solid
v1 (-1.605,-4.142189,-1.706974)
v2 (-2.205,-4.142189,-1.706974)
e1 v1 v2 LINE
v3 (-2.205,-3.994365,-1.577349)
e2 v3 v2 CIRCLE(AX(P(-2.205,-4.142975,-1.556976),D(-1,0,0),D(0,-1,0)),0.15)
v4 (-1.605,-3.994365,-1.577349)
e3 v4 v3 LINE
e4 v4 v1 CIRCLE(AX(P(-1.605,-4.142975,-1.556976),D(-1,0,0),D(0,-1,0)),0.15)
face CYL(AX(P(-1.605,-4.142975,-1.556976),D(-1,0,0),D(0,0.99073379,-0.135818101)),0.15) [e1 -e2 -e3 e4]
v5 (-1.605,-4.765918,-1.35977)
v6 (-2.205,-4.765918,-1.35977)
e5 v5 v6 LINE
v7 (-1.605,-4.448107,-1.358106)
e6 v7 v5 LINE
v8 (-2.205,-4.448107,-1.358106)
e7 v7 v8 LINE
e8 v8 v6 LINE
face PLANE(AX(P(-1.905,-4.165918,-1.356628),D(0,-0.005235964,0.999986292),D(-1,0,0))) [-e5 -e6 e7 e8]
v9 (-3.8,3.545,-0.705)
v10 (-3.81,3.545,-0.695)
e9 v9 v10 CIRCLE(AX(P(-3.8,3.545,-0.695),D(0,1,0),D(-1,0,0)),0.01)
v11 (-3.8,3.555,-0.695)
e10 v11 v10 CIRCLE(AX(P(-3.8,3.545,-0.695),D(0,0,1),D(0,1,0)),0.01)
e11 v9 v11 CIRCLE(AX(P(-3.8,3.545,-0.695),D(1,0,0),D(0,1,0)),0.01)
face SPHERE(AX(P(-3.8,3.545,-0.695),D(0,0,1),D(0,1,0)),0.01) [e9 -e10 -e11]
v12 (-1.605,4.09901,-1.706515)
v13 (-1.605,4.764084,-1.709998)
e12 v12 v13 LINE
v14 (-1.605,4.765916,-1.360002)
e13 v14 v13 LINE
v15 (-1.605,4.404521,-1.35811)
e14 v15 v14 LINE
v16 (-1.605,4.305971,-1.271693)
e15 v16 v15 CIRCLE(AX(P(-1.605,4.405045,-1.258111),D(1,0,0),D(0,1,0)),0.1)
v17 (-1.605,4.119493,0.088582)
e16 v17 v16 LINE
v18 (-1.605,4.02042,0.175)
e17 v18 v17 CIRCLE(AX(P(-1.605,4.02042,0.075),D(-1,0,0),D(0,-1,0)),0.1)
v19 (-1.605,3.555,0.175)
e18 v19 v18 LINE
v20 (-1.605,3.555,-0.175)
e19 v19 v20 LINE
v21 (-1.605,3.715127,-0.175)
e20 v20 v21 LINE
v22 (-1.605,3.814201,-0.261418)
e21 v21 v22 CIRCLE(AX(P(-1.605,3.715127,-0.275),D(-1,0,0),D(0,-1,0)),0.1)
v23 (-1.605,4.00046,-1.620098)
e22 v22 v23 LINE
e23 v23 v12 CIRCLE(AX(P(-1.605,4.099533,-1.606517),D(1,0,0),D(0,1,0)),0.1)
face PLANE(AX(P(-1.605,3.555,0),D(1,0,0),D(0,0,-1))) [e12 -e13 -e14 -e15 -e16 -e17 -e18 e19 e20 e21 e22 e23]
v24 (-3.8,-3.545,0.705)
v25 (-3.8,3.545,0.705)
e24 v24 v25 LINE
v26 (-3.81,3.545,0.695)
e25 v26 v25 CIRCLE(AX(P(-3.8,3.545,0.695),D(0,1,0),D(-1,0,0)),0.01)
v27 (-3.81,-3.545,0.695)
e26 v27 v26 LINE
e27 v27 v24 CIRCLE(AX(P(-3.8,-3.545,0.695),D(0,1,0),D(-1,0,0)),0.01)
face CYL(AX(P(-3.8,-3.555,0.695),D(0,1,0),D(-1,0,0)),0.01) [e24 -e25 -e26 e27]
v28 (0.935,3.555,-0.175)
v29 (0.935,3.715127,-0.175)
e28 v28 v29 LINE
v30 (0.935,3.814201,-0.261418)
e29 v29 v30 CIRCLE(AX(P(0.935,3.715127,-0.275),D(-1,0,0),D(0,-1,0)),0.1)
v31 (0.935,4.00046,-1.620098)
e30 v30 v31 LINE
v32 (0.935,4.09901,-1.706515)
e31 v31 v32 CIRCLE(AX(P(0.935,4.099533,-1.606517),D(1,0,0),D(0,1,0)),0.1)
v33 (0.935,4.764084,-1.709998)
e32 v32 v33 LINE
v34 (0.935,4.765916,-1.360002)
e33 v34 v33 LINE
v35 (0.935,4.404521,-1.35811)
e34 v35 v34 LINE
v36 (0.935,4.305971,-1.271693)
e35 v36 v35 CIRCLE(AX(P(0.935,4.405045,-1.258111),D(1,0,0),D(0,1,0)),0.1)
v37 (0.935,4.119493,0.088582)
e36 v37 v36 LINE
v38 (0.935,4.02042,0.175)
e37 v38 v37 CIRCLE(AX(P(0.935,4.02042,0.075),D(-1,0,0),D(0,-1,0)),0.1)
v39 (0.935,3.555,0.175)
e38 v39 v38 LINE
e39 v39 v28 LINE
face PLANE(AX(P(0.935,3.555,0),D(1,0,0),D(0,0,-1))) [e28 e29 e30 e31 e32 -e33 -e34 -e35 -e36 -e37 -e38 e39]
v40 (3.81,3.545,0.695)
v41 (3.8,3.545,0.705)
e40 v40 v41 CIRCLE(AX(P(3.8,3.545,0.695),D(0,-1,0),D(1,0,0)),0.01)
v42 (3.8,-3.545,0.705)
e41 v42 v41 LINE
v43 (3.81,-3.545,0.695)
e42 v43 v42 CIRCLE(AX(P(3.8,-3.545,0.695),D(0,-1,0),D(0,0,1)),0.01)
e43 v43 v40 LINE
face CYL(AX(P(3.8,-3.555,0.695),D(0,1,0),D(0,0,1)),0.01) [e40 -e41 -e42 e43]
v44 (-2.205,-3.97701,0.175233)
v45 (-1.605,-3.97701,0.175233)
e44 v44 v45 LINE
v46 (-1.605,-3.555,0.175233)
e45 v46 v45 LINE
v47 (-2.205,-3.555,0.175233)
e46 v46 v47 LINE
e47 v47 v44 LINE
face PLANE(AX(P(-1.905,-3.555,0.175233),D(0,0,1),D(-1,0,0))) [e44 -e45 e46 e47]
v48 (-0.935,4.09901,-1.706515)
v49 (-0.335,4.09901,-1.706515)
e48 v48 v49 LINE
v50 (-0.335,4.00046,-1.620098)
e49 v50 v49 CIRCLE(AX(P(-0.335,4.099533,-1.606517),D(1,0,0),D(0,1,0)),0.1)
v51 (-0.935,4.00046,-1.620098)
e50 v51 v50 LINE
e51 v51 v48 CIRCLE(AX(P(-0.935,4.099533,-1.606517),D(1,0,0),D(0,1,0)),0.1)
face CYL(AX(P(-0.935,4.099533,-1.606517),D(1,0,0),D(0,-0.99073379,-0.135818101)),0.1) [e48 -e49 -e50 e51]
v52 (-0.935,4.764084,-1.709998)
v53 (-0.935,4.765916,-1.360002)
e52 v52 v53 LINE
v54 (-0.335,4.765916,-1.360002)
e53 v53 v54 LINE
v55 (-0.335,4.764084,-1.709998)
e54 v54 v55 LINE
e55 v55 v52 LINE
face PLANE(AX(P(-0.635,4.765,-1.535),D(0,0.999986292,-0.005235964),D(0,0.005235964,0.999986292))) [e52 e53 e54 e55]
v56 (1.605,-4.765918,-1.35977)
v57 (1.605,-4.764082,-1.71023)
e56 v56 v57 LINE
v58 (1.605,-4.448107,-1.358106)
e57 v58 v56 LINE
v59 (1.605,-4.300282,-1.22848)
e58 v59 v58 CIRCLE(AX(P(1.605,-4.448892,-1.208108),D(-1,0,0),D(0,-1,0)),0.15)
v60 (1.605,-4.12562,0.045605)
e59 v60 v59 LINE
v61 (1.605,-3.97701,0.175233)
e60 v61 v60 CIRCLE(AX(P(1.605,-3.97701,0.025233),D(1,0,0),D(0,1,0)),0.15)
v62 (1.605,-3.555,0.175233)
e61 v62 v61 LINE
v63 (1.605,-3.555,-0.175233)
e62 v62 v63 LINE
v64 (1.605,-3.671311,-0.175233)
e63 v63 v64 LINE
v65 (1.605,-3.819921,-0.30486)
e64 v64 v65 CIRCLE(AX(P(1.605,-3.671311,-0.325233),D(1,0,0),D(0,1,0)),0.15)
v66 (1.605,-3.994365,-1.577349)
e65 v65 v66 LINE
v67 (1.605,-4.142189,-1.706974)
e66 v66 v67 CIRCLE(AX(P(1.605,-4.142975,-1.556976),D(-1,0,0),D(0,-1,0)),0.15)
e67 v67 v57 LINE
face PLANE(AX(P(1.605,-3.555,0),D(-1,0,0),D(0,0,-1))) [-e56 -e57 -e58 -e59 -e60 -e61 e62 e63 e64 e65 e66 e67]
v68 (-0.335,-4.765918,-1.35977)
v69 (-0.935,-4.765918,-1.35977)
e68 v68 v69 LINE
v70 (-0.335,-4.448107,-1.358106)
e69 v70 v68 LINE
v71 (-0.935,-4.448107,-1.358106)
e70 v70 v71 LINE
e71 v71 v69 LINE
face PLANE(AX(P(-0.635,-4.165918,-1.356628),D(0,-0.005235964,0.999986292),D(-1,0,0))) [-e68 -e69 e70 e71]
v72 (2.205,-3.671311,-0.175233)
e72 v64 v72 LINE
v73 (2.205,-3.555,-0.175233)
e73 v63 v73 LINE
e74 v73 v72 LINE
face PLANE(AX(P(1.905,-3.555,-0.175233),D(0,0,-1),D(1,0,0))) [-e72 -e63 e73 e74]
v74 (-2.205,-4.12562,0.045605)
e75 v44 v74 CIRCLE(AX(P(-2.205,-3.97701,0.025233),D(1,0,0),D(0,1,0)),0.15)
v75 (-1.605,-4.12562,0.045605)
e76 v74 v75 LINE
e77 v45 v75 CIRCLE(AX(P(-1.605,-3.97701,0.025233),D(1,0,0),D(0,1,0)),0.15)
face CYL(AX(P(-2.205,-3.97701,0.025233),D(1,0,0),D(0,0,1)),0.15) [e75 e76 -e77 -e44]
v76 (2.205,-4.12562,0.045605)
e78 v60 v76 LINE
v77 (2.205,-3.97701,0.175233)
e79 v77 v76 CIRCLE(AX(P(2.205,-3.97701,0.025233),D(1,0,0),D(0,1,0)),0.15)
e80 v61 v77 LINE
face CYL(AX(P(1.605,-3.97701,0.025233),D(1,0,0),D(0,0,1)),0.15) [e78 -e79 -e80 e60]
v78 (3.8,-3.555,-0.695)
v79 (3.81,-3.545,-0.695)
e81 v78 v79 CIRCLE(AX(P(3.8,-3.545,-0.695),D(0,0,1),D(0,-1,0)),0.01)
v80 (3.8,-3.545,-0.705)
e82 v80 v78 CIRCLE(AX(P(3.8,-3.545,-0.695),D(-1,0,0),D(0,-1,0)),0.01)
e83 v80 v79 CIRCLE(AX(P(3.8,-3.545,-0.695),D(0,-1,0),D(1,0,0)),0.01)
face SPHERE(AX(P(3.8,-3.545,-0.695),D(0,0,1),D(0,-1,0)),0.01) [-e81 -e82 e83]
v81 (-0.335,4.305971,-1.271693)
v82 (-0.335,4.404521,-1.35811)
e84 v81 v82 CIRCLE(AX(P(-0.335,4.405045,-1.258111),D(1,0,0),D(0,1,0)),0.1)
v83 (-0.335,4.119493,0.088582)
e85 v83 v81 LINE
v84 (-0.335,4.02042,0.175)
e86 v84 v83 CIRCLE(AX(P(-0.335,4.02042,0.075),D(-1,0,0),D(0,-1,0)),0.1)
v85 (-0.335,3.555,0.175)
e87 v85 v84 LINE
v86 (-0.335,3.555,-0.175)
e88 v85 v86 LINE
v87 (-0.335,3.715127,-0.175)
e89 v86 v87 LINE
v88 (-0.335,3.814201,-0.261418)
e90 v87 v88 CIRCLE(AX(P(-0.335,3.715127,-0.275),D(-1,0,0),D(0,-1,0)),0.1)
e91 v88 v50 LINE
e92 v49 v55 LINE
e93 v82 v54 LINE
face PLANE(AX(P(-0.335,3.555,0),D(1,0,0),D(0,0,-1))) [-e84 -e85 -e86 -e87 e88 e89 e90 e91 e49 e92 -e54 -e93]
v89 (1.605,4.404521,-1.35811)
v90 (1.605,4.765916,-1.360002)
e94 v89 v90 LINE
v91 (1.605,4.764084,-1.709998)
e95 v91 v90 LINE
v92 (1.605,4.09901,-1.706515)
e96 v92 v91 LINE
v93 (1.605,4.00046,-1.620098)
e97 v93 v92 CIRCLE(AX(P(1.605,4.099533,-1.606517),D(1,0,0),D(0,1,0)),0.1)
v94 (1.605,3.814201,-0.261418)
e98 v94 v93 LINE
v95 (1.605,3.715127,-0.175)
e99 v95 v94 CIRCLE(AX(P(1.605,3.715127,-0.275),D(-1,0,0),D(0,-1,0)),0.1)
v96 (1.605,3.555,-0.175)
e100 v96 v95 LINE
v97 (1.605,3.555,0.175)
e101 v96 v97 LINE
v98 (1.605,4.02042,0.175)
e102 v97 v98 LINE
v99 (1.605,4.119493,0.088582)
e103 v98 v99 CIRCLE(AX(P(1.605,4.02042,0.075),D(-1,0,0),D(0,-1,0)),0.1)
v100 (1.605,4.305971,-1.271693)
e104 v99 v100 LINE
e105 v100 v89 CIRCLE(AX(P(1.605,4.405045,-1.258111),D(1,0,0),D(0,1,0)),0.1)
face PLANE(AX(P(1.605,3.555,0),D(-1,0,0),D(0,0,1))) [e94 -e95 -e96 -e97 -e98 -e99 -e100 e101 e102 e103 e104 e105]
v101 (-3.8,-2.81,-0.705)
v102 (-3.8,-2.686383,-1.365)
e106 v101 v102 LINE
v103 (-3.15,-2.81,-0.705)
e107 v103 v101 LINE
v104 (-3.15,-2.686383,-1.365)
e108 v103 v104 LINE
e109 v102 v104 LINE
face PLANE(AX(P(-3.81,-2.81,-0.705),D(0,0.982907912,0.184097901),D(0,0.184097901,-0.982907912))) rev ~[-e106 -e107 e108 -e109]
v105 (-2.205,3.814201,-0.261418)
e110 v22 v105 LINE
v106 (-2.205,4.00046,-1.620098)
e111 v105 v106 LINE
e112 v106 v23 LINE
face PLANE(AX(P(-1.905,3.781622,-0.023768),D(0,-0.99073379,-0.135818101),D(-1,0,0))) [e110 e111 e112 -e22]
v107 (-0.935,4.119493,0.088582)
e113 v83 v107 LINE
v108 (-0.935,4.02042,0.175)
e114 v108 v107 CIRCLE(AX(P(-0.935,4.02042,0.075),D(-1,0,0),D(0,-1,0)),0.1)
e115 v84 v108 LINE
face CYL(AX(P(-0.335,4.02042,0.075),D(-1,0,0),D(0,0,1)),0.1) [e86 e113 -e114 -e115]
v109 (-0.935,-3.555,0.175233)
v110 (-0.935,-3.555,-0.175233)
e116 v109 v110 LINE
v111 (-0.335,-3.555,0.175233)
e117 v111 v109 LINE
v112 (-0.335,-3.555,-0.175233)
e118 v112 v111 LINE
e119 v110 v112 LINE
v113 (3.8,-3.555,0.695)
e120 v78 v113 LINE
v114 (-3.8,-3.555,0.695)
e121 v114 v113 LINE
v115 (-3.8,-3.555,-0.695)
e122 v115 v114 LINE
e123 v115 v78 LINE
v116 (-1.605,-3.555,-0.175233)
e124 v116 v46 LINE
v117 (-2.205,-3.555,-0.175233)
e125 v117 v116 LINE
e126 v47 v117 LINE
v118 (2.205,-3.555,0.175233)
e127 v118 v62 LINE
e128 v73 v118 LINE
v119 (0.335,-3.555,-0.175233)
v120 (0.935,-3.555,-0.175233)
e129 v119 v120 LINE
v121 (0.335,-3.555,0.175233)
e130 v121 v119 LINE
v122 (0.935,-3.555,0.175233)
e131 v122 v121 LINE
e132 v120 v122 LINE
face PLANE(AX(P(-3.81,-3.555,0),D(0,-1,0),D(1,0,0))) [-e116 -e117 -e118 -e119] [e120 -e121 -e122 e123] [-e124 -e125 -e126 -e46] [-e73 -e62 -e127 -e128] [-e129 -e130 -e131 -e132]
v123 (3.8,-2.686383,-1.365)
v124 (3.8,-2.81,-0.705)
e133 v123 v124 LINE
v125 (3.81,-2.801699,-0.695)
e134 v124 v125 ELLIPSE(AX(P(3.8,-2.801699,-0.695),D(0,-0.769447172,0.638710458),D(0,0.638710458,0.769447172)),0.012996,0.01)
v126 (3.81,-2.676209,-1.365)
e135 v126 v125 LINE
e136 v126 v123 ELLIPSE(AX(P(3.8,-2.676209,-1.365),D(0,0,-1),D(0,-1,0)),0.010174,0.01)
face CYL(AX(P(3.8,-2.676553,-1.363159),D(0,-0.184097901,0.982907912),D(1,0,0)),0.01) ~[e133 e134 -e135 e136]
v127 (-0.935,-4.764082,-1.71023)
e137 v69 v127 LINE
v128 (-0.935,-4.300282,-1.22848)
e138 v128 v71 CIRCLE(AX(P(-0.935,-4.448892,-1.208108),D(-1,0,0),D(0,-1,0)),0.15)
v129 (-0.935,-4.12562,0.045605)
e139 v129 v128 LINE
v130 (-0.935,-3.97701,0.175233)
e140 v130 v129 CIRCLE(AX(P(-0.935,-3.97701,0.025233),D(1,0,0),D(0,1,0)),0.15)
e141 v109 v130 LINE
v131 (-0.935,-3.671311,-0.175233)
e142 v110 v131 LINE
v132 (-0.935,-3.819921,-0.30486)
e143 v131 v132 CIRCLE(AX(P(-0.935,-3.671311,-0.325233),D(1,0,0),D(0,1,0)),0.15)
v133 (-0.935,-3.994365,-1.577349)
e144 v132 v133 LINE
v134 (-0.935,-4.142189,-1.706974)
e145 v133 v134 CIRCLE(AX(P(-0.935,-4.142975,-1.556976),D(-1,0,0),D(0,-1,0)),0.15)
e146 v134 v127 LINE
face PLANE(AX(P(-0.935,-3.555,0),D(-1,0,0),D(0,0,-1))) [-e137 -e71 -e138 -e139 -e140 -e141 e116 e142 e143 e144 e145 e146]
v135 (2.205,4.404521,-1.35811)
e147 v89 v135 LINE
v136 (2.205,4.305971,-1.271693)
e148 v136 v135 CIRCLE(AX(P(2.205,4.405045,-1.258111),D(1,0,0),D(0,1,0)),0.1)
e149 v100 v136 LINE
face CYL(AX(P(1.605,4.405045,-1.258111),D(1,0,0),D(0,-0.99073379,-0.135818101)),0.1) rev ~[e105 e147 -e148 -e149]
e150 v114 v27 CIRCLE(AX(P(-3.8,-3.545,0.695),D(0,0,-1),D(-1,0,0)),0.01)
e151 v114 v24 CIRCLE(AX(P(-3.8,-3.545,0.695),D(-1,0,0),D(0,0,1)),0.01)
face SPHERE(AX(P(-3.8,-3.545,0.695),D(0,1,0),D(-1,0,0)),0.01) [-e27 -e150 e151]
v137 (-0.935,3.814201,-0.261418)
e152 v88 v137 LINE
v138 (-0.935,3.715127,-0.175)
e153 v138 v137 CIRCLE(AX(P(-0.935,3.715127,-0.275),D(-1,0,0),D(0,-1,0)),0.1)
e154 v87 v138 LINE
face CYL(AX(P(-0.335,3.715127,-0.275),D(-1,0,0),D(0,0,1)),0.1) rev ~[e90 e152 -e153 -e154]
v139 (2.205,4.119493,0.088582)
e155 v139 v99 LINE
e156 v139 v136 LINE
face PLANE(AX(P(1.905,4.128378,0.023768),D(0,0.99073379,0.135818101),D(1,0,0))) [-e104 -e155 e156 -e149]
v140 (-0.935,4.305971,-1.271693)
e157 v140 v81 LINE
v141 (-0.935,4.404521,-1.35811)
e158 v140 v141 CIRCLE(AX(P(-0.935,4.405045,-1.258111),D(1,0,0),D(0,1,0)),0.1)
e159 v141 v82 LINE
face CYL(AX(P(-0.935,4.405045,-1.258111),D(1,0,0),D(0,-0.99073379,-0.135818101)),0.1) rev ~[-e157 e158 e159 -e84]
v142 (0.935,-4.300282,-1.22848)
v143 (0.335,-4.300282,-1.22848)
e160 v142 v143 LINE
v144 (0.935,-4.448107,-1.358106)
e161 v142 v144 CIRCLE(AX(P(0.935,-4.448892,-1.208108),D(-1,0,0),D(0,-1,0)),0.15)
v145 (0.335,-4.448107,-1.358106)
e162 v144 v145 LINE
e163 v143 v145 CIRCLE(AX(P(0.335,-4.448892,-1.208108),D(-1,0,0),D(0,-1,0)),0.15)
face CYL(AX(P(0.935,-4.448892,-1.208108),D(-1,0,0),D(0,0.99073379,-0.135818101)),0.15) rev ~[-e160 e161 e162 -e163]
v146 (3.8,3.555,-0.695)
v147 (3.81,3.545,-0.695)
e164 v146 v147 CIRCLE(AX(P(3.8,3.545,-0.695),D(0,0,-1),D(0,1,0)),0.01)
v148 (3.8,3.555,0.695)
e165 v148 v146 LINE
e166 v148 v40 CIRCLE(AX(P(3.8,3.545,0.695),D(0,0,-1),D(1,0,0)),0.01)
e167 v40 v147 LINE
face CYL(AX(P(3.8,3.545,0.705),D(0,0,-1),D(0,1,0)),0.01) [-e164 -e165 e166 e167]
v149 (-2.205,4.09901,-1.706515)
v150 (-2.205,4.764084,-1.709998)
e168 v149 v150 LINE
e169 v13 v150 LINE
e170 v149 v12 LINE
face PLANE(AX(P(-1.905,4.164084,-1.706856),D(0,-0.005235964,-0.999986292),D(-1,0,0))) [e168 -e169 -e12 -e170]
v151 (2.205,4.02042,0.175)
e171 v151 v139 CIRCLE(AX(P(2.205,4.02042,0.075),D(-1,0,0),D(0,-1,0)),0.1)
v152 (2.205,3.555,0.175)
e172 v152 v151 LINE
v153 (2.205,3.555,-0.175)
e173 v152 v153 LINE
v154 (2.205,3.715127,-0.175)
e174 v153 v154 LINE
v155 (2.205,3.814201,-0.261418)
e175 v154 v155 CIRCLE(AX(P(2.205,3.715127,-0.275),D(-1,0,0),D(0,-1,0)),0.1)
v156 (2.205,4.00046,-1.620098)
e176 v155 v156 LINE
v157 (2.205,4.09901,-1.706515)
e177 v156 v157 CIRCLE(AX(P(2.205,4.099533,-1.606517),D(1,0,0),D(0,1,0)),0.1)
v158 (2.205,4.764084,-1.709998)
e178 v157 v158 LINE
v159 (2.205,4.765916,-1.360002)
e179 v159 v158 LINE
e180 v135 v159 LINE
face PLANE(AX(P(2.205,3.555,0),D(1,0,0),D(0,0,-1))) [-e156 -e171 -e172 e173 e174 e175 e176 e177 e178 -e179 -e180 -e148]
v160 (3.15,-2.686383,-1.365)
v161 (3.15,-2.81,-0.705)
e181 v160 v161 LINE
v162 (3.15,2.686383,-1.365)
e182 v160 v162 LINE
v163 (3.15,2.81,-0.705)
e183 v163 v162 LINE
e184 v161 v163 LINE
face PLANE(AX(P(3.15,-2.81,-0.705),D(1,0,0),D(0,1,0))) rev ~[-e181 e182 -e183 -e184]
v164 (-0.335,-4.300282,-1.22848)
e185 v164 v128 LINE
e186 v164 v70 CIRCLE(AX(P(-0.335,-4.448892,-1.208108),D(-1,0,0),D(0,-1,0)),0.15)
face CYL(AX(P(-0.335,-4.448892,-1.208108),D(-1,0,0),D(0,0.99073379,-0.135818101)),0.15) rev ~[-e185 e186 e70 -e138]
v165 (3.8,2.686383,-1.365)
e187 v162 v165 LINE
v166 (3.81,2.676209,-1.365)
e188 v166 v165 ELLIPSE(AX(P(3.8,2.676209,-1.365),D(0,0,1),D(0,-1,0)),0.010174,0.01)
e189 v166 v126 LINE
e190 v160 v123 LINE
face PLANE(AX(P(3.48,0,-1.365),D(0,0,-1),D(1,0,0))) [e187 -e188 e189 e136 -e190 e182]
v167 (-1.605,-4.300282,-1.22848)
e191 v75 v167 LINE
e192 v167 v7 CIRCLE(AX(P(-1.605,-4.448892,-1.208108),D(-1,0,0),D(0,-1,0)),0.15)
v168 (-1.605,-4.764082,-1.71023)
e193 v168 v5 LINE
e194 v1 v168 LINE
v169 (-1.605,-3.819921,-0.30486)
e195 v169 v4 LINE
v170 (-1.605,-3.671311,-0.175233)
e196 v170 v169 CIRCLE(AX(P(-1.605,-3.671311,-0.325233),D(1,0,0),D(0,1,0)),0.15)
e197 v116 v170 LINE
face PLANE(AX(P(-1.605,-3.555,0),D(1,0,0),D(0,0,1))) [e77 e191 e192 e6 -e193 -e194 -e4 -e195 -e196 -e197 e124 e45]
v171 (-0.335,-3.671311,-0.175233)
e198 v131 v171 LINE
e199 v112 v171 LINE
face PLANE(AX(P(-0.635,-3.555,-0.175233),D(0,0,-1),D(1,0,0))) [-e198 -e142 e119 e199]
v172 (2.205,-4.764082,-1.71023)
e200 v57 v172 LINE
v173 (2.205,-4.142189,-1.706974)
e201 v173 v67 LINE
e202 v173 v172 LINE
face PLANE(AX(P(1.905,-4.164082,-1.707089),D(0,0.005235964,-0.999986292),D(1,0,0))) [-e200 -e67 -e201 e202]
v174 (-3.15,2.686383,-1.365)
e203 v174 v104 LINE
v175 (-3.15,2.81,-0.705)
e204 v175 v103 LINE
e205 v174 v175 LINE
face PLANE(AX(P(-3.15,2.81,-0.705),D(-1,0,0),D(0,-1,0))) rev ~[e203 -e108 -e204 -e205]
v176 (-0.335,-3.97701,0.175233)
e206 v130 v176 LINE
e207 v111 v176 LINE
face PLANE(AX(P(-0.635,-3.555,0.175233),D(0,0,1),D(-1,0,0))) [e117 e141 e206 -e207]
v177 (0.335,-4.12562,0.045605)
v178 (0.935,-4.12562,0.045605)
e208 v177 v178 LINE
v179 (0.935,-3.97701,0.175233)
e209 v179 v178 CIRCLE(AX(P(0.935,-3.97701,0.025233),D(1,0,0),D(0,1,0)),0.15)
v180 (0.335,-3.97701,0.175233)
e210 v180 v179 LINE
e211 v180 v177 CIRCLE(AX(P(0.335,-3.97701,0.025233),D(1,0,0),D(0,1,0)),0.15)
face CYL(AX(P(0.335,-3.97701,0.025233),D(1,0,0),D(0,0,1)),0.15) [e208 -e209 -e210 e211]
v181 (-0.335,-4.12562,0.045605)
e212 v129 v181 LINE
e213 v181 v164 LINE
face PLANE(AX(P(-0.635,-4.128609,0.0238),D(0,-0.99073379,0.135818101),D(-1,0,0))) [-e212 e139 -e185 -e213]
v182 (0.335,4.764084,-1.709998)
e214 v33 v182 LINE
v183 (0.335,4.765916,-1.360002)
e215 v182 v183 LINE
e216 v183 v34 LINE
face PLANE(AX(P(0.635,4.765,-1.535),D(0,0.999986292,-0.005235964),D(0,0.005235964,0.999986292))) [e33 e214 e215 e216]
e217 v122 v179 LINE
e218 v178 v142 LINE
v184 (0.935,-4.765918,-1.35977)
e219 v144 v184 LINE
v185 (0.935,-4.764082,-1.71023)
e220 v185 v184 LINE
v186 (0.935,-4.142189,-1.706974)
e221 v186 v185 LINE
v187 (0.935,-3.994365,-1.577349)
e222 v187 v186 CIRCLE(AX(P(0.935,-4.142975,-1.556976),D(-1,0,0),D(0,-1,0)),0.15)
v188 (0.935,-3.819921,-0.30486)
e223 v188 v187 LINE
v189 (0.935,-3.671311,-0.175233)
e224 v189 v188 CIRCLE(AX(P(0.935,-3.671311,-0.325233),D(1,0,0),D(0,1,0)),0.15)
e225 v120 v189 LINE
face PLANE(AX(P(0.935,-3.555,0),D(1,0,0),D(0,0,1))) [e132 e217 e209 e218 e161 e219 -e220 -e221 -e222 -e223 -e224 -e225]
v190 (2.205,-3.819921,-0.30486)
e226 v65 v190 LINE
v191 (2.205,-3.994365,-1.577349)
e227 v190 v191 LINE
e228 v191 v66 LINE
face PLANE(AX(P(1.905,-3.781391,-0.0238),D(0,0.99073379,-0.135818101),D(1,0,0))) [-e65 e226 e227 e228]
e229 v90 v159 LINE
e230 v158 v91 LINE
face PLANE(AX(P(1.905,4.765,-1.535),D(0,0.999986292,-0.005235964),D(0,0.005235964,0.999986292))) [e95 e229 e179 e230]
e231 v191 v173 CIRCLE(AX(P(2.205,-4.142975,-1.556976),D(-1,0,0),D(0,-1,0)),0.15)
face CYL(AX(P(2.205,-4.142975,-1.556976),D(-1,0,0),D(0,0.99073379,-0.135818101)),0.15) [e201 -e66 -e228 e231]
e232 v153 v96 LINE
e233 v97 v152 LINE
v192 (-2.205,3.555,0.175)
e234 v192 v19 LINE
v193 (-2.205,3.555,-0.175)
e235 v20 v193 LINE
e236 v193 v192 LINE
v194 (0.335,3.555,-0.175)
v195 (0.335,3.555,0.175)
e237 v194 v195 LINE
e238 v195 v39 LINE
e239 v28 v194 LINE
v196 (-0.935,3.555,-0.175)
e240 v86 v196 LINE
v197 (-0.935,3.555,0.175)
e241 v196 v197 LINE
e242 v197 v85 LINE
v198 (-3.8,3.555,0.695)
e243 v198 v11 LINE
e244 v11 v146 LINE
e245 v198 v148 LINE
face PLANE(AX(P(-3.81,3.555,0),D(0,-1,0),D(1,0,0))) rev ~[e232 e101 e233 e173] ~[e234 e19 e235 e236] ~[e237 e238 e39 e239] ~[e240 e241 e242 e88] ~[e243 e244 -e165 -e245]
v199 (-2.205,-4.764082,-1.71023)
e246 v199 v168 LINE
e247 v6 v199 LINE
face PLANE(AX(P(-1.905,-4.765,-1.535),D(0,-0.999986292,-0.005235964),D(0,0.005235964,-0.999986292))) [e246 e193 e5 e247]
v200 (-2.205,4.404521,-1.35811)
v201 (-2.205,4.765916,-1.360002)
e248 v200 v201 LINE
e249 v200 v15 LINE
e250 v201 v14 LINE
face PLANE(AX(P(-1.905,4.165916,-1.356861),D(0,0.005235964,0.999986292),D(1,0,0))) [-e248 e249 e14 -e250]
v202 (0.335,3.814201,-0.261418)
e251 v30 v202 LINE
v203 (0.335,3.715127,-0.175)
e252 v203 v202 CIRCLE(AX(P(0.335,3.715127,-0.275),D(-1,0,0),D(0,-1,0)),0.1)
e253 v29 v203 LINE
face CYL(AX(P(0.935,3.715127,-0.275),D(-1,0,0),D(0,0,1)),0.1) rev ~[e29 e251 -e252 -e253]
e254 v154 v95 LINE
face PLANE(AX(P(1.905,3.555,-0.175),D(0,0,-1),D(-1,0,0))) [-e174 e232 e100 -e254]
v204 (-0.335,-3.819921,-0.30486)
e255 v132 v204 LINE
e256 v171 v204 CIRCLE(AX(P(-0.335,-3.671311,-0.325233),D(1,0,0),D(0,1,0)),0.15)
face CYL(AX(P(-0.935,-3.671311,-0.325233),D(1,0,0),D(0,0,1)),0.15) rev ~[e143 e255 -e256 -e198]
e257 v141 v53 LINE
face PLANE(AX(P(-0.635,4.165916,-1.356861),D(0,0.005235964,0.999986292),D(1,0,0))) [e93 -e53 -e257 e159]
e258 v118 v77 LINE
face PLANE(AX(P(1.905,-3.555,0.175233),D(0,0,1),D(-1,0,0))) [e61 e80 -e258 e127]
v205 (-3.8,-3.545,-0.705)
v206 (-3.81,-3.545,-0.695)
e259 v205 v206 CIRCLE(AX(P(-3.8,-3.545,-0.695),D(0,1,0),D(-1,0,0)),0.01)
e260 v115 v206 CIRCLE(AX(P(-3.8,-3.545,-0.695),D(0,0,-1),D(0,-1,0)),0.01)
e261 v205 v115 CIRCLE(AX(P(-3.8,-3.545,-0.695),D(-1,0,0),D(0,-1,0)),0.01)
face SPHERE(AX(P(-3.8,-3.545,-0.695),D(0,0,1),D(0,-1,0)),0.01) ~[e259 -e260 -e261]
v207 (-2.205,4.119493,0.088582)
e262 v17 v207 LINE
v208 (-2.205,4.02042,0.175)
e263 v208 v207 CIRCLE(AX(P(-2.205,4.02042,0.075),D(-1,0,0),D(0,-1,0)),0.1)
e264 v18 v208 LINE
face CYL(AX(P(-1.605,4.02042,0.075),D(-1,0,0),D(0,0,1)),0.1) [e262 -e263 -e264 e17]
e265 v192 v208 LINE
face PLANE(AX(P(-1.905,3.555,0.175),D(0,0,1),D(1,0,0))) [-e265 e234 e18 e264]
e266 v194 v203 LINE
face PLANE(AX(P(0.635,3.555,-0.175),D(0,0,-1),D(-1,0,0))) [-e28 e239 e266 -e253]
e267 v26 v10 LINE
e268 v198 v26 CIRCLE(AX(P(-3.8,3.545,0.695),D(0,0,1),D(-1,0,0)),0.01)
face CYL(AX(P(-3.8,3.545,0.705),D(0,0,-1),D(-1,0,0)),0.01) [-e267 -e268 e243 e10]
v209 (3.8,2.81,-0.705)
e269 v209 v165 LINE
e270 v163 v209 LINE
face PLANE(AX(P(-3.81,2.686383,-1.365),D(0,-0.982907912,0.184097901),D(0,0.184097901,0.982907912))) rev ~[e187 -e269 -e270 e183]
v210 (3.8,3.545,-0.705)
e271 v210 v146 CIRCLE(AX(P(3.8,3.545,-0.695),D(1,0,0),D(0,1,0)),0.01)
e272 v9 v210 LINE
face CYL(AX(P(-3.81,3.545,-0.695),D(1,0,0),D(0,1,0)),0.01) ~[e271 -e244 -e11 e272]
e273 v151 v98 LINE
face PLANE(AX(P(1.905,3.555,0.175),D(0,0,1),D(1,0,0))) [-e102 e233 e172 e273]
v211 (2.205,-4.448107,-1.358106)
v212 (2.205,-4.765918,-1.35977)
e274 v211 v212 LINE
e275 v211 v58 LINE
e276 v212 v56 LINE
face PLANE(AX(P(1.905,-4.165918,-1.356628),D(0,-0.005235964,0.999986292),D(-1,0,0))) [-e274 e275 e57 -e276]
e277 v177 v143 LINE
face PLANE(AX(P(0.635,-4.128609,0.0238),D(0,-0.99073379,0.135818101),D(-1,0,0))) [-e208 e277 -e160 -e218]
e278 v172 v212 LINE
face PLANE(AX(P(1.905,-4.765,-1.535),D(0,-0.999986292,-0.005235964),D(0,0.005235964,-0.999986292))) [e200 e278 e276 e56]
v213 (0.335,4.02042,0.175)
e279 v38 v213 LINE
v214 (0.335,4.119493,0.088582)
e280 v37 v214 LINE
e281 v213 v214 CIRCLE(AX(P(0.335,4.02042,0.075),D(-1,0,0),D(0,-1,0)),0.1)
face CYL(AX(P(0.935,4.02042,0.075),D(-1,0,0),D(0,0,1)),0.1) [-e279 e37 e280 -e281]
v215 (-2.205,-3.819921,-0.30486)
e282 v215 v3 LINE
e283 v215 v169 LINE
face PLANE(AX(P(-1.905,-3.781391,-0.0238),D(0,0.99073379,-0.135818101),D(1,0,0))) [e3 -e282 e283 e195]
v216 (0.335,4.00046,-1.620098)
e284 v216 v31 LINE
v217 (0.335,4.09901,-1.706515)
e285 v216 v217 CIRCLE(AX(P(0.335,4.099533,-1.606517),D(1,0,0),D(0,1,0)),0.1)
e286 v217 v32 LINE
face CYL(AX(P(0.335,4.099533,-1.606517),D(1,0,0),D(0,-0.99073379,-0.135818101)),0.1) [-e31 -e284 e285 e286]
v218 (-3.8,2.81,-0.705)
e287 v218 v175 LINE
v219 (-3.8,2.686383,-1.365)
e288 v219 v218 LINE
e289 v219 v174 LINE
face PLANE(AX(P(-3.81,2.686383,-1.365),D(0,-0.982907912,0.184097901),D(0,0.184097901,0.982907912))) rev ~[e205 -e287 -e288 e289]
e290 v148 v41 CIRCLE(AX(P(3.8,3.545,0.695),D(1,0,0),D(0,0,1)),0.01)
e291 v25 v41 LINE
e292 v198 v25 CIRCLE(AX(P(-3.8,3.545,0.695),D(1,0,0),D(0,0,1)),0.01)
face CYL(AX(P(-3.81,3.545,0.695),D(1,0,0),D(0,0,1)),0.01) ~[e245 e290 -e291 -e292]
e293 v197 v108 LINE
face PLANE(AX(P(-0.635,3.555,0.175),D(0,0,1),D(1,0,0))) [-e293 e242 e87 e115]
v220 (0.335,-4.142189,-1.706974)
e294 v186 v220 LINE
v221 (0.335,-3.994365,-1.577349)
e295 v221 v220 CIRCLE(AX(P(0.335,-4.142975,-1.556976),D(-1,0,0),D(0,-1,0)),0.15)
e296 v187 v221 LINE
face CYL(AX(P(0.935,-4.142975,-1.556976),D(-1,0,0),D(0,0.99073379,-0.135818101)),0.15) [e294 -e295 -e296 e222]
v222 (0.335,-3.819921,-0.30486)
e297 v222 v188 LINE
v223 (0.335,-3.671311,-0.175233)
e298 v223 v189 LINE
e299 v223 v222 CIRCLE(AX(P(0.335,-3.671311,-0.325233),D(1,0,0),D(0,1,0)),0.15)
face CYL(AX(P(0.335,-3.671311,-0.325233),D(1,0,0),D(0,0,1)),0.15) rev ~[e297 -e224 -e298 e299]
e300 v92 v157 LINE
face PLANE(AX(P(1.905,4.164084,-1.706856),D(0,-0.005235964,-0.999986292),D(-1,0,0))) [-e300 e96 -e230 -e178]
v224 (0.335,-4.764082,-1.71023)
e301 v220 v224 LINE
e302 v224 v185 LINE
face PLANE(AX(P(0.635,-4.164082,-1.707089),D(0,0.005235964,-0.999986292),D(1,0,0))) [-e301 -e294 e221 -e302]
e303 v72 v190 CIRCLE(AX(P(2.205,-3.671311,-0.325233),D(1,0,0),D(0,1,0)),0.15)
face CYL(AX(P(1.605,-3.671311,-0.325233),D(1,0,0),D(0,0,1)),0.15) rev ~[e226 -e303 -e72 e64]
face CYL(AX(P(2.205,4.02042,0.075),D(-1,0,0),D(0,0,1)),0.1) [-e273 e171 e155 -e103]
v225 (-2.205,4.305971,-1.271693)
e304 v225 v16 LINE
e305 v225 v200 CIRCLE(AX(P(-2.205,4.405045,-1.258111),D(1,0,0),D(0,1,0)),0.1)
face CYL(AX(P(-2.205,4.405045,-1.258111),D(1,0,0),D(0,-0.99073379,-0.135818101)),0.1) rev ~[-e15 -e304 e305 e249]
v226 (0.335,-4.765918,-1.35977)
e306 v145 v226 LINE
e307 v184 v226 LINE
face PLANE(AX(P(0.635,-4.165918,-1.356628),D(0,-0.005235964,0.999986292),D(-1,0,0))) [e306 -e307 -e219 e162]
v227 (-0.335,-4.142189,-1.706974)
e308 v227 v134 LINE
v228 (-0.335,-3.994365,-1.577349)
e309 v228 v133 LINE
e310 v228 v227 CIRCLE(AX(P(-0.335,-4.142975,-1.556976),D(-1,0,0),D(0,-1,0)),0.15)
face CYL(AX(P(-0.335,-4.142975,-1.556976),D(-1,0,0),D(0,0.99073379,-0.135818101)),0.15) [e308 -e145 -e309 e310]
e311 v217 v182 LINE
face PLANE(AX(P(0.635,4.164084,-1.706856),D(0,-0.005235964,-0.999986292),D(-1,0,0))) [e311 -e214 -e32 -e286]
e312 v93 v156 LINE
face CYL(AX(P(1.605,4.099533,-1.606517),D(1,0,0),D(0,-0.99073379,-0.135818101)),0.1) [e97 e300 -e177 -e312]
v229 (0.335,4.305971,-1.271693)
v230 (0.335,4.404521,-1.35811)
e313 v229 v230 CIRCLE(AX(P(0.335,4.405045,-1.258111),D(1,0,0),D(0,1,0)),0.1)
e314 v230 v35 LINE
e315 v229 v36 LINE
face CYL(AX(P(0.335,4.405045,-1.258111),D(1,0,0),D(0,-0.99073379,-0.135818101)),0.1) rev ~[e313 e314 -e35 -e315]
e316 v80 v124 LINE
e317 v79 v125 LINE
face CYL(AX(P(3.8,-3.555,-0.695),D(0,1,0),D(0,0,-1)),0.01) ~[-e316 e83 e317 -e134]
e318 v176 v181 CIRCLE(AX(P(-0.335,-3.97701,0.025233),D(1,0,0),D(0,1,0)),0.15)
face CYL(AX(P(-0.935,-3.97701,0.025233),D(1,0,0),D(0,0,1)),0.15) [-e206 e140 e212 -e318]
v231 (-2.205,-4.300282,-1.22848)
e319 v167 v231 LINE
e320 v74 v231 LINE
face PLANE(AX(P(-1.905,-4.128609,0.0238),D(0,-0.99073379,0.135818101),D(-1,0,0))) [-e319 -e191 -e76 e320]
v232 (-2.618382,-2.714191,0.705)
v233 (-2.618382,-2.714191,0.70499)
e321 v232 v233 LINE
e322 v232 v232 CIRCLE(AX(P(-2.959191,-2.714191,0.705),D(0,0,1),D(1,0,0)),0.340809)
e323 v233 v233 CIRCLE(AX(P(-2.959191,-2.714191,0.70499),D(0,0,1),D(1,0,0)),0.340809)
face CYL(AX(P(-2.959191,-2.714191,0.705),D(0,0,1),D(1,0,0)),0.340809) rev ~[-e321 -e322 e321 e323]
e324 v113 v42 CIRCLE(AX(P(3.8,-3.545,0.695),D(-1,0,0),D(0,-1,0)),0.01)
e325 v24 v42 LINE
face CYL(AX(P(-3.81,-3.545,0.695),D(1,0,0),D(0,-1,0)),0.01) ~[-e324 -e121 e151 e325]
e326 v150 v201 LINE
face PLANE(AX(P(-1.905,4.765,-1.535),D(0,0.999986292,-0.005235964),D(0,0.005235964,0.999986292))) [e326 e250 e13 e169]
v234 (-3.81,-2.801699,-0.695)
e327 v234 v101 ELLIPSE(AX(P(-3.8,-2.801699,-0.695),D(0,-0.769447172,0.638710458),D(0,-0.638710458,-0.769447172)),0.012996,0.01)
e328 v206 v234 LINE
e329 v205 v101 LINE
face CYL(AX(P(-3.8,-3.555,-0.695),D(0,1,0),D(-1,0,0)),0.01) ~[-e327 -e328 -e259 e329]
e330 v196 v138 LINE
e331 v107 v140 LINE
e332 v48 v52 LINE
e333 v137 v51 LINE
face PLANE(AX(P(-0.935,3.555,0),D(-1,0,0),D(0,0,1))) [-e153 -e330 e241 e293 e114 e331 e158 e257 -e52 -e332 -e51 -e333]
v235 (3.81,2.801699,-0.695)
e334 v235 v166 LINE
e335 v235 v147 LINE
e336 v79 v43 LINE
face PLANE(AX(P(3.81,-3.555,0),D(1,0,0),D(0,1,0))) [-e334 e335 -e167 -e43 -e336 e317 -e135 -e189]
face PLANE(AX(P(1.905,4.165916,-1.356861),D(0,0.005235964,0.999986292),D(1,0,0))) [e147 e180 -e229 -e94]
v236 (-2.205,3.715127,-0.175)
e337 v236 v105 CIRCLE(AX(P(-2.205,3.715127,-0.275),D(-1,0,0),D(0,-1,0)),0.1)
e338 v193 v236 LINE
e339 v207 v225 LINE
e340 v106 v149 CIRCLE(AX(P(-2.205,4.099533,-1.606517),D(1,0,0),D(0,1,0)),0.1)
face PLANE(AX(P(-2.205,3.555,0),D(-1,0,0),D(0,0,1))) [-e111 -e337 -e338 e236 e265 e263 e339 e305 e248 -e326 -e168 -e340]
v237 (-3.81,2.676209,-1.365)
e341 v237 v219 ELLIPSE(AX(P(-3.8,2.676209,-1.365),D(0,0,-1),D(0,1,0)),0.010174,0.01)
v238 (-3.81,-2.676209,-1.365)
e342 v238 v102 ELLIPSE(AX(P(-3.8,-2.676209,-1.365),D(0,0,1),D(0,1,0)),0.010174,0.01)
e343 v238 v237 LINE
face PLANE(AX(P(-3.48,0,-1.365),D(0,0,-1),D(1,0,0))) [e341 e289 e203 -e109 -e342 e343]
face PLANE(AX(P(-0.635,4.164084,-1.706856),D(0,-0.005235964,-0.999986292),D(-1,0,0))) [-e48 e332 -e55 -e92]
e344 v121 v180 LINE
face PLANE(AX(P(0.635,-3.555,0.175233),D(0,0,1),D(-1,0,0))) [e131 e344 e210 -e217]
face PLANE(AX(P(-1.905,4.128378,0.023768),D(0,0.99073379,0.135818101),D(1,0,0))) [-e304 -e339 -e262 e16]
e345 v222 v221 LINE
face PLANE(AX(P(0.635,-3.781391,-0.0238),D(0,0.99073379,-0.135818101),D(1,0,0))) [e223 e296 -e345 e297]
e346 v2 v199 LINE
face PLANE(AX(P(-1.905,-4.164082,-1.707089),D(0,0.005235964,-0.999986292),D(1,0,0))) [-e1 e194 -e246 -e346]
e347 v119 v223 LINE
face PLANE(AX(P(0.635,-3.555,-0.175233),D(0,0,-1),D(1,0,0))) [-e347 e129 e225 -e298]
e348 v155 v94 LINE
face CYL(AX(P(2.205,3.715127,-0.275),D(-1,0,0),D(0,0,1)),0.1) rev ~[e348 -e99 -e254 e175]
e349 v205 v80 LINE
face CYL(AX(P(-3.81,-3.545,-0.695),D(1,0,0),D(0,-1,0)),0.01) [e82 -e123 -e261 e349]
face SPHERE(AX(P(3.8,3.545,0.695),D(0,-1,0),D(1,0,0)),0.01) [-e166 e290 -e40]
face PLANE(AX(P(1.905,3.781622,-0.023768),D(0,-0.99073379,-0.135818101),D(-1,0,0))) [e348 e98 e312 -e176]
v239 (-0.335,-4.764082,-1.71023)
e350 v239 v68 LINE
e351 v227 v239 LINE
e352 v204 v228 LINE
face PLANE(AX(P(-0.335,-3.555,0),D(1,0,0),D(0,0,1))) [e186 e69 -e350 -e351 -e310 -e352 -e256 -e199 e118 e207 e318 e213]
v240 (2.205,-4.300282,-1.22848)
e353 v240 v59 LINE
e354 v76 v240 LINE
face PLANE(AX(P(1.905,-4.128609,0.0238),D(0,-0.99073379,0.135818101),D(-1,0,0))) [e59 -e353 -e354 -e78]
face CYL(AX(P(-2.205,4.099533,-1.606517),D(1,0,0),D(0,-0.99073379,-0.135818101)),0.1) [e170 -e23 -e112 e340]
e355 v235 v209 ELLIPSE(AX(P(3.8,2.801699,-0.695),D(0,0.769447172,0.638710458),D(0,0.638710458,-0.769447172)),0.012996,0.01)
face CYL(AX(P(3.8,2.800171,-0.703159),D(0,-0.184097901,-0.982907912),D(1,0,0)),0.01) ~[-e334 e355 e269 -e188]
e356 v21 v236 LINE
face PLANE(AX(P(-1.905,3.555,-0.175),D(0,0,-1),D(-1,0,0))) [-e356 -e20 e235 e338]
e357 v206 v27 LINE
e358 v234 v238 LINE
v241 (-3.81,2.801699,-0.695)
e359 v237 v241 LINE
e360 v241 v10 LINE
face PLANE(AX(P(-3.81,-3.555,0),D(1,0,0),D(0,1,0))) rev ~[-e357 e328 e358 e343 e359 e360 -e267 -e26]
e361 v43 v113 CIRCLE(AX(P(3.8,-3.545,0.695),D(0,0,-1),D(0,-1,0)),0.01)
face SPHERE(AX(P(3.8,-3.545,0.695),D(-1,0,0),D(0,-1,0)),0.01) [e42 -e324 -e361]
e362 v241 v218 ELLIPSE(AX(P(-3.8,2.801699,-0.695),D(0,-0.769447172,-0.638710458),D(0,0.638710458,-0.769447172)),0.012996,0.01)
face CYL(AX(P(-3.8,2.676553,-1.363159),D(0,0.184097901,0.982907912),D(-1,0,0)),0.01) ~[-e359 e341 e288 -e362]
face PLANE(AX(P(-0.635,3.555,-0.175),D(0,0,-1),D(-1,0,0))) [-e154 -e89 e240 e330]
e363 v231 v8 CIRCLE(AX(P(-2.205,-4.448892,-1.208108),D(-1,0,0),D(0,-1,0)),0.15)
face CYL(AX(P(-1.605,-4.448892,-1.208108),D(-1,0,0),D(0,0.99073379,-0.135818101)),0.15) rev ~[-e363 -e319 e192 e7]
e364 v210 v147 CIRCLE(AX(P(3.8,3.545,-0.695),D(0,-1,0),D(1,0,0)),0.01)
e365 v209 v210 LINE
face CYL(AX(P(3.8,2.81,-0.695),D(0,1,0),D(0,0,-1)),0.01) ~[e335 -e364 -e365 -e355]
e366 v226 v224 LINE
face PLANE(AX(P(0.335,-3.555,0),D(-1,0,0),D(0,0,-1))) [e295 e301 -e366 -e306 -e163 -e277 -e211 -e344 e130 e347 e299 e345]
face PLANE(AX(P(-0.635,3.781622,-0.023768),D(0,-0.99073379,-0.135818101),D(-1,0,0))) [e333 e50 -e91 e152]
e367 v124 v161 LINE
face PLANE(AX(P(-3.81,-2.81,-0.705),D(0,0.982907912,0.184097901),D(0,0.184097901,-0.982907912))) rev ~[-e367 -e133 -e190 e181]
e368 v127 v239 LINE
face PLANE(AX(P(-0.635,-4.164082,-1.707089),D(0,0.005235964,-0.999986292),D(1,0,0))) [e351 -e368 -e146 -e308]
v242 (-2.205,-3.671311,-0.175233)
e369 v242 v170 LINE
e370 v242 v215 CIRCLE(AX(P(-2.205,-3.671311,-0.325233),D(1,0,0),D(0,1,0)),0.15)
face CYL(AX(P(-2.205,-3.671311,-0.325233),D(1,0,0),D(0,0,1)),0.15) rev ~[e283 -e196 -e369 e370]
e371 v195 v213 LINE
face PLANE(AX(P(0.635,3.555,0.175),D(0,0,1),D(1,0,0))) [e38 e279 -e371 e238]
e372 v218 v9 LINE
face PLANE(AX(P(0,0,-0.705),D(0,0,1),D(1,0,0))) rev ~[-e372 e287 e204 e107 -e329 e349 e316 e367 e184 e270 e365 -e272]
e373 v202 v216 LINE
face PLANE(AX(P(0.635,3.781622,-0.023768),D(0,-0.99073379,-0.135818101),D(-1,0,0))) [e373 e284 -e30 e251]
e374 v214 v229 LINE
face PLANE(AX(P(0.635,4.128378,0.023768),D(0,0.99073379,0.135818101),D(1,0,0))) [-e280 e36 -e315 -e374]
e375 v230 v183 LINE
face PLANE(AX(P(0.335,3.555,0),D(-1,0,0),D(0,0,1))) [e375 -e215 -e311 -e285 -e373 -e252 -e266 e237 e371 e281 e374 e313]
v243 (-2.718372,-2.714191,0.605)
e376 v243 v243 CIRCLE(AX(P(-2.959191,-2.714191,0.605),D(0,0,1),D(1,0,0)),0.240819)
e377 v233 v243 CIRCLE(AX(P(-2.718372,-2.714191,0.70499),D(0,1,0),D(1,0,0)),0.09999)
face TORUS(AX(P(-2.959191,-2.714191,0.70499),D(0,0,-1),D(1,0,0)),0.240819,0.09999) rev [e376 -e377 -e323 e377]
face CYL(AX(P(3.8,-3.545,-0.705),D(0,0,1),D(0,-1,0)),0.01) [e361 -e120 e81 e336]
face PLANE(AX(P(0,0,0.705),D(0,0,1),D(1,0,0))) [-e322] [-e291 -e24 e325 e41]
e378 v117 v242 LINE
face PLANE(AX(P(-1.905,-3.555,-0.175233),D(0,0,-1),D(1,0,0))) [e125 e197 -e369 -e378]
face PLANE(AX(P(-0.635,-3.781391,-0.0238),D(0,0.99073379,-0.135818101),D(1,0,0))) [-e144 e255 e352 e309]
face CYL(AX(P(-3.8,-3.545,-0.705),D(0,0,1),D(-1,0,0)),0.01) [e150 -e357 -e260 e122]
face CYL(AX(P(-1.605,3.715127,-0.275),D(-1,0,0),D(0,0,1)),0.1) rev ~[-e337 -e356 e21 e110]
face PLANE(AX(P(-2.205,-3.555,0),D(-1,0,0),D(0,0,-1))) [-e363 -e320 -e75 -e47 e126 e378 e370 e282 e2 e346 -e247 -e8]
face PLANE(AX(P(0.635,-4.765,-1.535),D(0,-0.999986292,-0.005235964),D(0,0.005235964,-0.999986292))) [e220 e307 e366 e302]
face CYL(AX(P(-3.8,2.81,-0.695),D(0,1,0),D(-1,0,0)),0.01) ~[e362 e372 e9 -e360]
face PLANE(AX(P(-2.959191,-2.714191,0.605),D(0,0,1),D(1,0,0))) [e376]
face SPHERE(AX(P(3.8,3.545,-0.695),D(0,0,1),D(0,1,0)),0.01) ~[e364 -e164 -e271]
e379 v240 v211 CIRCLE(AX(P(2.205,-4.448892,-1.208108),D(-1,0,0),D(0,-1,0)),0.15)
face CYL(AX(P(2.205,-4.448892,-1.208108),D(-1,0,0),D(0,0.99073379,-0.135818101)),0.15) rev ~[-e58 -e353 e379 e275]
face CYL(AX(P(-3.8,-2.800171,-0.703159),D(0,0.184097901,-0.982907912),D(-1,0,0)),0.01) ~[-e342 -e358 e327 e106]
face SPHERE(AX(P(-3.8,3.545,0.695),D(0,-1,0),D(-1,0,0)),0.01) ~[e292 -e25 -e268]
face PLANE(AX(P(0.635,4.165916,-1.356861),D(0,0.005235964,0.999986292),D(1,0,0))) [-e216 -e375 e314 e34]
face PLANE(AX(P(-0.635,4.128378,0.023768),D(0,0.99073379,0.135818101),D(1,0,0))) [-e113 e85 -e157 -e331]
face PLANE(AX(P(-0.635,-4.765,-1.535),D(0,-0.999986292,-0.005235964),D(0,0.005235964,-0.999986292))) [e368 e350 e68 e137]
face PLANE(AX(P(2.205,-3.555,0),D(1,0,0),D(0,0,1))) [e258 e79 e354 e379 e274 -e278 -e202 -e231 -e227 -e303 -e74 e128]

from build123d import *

# Parameters (mm, degrees)
F0_W     = 7.62
F0_H     = 7.11
F1_DEPTH = 0.705
F3_DEPTH = 0.66
F5_DEPTH = 25
F6_R     = 0.01
F7_R     = 0.3408088795
F8_DEPTH = 0.1
F9_R     = 0.09999
F11_W    = 0.6
F11_H    = 0.35
F13_R    = 0.1
F14_W    = 0.6
F14_H    = 0.3504652178
F16_R    = 0.15


# Not quite as in the source:
# - a fillet or chamfer is up to 0.001 mm smaller than in the source, because OpenCascade refuses the exact size
# - a feature names something its author has since deleted; it is built from what else it names


with BuildPart() as f1:
    # F0 (on Top) → F1 (new body, symmetric)
    with BuildSketch(Plane.XY):
        Rectangle(F0_W, F0_H)
    extrude(amount=F1_DEPTH, both=True)

    # F2 (on face) → F3 (join)
    with BuildSketch(Plane(origin=(0, 0, -0.705), x_dir=(1, 0, 0), z_dir=(0, 0, -1))):
        Polygon((-3.81, 2.81), (-3.81, 0), (-3.81, -2.81), (-3.15, -2.81), (-3.15, 2.81), align=None)
        Polygon((3.81, 0), (3.81, 2.81), (3.15, 2.81), (3.15, -2.81), (3.81, -2.81), align=None)
    extrude(amount=F3_DEPTH)

    # F4 (on face) → F5 (cut)
    with BuildSketch(Plane(origin=(-3.81, 0, 0), x_dir=(0, -1, 0), z_dir=(-1, 0, 0))):
        Polygon((-2.81, -1.365), (-2.6863825042, -1.365), (-2.81, -0.705), align=None)
        Polygon((2.81, -1.365), (2.81, -0.705), (2.6863825042, -1.365), align=None)
    extrude(amount=-F5_DEPTH, mode=Mode.SUBTRACT)

    # F6
    f6_edges = [f1.edges().sort_by_distance(p)[0] for p in [
        (-3.81, 0, 0.705),
        (-3.81, -3.555, 0),
        (0, -3.555, 0.705),
        (-3.81, 3.555, 0),
        (3.81, -3.555, 0),
        (3.81, 0, 0.705),
        (3.81, 3.555, 0),
        (0, 3.555, 0.705),
        (0, 3.555, -0.705),
        (0, -3.555, -0.705),
        (3.81, -3.1825, -0.705),
        (3.81, -2.748191, -1.035),
        (3.81, 2.748191, -1.035),
        (3.81, 3.1825, -0.705),
        (-3.81, -2.748191, -1.035),
        (-3.81, -3.1825, -0.705),
        (-3.81, 3.1825, -0.705),
        (-3.81, 2.748191, -1.035),
    ]]
    fillet(f6_edges, radius=F6_R)

    # F7 (on face) → F8 (cut)
    with BuildSketch(Plane.XY.offset(0.705)):
        with Locations((-2.9591911205, -2.7141911205)):
            Circle(F7_R)
    extrude(amount=-F8_DEPTH, mode=Mode.SUBTRACT)

    # F9 (radius 0.1 in the source; OpenCascade refuses exactly that, so slightly less here)
    f9_edges = [f1.edges().sort_by_distance(p)[0] for p in [
        (-3.3, -2.714191, 0.605),
    ]]
    fillet(f9_edges, radius=F9_R)

    # F12: sweep along a path in F10
    with BuildLine(Plane.YZ) as f12_path:
        Line((3.555, 0), (3.955, 0))
        Line((3.955, 0), (4.165, -1.5318583786))
        Line((4.165, -1.5318583786), (4.765, -1.535))
    # F11 (on face) → F12 (sweep)
    with BuildSketch(Plane(origin=(0, 3.555, 0), x_dir=(-1, 0, 0), z_dir=(0, 1, 0))):
        with Locations((-1.905, 0)):
            Rectangle(F11_W, F11_H)
        with Locations((-0.635, 0)):
            Rectangle(F11_W, F11_H)
        with Locations((0.635, 0)):
            Rectangle(F11_W, F11_H)
        with Locations((1.905, 0)):
            Rectangle(F11_W, F11_H)
    sweep(path=f12_path.line, transition=Transition.RIGHT)

    # F13
    f13_edges = [f1.edges().sort_by_distance(p)[0] for p in [
        (-1.905, 4.107646, 0.175),
        (-1.905, 4.317756, -1.357656),
        (-0.635, 4.107646, 0.175),
        (-0.635, 4.317756, -1.357656),
        (0.635, 4.107646, 0.175),
        (0.635, 4.317756, -1.357656),
        (1.905, 4.107646, 0.175),
        (1.905, 4.317756, -1.357656),
        (1.905, 3.802354, -0.175),
        (0.635, 3.802354, -0.175),
        (-0.635, 3.802354, -0.175),
        (-1.905, 3.802354, -0.175),
        (-1.905, 4.012244, -1.706061),
        (-0.635, 4.012244, -1.706061),
        (0.635, 4.012244, -1.706061),
        (1.905, 4.012244, -1.706061),
    ]]
    fillet(f13_edges, radius=F13_R)

    # F15: sweep along a path in F10
    with BuildLine(Plane.YZ) as f15_path:
        Line((-3.555, 0), (-3.955, 0))
        Line((-3.955, 0), (-4.165, -1.5318583786))
        Line((-4.165, -1.5318583786), (-4.765, -1.535))
    # F14 (on face) → F15 (sweep)
    with BuildSketch(Plane.XZ.offset(3.555)):
        with Locations((-1.905, 0)):
            Rectangle(F14_W, F14_H)
        with Locations((-0.635, 0)):
            Rectangle(F14_W, F14_H)
        with Locations((0.635, 0)):
            Rectangle(F14_W, F14_H)
        with Locations((1.905, 0)):
            Rectangle(F14_W, F14_H)
    sweep(path=f15_path.line, transition=Transition.RIGHT)

    # F16
    f16_edges = [f1.edges().sort_by_distance(p)[0] for p in [
        (-1.905, -4.107849, 0.175233),
        (-0.635, -4.107849, 0.175233),
        (0.635, -4.107849, 0.175233),
        (1.905, -4.107849, 0.175233),
        (-1.905, -4.317959, -1.357424),
        (-0.635, -4.317959, -1.357424),
        (0.635, -4.317959, -1.357424),
        (1.905, -4.317959, -1.357424),
        (-1.905, -3.802151, -0.175233),
        (-0.635, -3.802151, -0.175233),
        (0.635, -3.802151, -0.175233),
        (1.905, -3.802151, -0.175233),
        (0.635, -4.012041, -1.706292),
        (-0.635, -4.012041, -1.706292),
        (-1.905, -4.012041, -1.706292),
        (1.905, -4.012041, -1.706292),
    ]]
    fillet(f16_edges, radius=F16_R)


solid = f1.part
